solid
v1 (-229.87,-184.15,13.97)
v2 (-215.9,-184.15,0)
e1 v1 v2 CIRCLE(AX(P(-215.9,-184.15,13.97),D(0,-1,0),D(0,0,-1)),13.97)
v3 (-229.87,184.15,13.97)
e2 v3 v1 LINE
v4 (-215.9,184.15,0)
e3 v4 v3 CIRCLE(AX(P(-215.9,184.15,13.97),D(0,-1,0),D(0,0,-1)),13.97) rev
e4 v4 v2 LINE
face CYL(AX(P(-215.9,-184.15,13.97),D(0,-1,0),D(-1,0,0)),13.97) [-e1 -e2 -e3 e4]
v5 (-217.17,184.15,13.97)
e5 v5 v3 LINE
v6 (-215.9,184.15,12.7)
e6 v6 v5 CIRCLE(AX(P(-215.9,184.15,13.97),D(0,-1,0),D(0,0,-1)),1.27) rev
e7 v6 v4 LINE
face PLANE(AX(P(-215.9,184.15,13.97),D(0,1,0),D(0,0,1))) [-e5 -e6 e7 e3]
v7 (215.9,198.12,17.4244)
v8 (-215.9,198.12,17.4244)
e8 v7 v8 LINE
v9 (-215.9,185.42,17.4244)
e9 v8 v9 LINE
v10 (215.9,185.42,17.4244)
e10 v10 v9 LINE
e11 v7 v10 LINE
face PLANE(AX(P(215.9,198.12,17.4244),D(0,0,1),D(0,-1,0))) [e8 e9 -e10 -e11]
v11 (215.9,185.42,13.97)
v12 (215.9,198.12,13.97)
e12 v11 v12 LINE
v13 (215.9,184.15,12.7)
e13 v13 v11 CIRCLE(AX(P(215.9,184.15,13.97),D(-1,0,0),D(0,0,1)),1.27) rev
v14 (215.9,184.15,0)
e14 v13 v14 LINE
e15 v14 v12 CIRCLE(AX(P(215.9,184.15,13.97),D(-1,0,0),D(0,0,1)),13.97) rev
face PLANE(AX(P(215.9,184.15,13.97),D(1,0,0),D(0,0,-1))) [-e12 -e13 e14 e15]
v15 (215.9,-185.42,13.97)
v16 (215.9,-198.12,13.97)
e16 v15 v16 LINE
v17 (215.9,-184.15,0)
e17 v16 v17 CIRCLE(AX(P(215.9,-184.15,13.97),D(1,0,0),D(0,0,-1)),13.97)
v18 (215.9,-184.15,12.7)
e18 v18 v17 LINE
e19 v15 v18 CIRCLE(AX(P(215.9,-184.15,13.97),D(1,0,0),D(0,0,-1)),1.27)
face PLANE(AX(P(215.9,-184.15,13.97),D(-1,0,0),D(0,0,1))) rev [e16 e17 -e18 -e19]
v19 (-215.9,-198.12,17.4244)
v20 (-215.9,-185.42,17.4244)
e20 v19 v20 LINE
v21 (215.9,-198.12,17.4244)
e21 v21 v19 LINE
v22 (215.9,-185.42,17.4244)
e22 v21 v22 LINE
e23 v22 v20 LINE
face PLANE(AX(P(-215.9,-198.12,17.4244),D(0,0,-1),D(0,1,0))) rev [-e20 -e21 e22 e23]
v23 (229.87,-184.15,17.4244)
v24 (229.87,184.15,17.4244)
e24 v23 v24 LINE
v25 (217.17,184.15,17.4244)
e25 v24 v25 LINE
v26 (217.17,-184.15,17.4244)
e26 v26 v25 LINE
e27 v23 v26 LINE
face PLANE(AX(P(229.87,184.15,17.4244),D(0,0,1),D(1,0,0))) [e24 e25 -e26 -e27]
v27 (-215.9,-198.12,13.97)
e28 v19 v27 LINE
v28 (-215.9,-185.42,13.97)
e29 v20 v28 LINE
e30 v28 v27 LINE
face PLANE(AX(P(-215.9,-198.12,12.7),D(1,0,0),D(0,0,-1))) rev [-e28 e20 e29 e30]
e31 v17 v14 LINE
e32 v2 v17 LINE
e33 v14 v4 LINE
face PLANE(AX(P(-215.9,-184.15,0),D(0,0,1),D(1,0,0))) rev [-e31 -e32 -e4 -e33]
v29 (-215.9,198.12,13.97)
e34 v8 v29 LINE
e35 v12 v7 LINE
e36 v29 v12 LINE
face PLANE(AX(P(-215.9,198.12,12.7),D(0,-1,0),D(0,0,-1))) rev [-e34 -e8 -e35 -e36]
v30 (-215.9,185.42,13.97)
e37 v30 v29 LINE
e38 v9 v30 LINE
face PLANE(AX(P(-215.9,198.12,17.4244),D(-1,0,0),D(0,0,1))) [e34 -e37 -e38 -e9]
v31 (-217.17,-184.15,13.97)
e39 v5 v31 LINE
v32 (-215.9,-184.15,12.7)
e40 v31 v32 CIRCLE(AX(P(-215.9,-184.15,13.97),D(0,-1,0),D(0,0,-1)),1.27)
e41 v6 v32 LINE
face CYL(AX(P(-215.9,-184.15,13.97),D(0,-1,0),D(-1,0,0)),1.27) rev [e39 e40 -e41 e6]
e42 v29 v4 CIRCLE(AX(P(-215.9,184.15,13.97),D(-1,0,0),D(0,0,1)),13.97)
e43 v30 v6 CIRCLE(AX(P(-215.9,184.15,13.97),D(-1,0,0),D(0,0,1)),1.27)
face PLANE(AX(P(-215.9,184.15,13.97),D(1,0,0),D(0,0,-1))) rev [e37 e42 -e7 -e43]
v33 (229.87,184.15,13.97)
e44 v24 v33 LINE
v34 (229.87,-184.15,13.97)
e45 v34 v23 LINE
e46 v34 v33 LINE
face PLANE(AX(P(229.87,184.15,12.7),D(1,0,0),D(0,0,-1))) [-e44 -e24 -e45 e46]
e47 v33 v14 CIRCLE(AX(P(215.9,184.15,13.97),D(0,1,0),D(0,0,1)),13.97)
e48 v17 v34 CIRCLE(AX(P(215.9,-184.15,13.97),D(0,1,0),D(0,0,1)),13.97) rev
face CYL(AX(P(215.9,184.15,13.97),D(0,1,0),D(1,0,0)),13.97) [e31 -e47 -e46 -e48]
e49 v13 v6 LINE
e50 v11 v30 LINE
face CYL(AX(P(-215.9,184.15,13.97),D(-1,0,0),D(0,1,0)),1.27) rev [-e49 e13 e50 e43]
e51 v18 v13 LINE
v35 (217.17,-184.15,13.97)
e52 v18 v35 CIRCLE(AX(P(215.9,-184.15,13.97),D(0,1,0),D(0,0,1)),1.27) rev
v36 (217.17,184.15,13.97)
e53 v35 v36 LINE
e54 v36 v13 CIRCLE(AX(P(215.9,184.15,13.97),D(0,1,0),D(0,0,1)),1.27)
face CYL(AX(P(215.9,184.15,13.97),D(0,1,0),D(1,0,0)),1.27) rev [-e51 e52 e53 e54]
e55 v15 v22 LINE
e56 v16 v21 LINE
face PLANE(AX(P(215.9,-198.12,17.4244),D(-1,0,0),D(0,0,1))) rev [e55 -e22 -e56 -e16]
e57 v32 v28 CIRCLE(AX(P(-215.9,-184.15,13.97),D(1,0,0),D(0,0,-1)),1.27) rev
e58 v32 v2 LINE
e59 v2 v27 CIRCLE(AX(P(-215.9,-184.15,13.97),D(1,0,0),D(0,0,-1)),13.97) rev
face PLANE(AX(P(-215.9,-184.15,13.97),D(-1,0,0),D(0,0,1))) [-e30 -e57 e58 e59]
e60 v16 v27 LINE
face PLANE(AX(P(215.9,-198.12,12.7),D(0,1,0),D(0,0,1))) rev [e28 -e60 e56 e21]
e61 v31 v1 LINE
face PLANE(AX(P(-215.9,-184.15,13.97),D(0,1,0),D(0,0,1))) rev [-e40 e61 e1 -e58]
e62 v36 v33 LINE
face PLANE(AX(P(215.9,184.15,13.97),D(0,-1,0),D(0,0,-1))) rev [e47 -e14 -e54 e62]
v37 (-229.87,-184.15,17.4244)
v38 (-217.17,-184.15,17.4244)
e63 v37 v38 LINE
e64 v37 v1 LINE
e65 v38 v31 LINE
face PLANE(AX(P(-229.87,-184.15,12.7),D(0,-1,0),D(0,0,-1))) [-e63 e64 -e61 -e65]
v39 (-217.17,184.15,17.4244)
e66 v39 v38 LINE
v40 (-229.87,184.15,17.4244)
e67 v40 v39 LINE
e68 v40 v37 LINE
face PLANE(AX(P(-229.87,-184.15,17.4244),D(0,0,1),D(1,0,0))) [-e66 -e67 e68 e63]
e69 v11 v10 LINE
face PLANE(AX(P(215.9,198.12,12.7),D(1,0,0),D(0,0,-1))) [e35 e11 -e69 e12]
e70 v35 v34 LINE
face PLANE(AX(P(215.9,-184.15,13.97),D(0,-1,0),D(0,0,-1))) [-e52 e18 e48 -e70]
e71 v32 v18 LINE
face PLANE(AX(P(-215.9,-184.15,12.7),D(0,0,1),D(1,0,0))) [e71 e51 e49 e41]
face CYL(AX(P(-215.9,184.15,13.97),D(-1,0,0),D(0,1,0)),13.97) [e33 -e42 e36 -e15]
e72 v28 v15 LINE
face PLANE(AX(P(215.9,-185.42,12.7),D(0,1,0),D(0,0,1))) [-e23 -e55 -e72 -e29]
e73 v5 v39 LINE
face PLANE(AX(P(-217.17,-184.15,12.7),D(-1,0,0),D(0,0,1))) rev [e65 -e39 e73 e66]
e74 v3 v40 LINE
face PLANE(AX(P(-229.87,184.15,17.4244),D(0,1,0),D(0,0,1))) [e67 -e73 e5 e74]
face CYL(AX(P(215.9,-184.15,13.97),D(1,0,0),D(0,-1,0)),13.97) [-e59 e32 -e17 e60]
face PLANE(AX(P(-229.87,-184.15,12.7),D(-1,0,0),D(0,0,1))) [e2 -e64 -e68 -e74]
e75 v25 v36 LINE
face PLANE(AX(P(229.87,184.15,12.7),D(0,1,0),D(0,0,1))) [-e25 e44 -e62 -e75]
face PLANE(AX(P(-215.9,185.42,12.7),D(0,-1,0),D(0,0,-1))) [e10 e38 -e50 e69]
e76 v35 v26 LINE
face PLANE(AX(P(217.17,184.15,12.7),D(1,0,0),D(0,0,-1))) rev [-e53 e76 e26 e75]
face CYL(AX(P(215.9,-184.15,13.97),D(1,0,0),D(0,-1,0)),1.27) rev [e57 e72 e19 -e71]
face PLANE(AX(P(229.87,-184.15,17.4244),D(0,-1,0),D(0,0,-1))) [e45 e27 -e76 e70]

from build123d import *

# Parameters (mm, degrees)
SKETCH1_W          = 431.8
SKETCH1_H          = 368.3
BASE_FLANGE1_DEPTH = 12.7
EDGE_FLANGE1_DEPTH = 431.8
EDGE_FLANGE2_DEPTH = 431.8
EDGE_FLANGE3_DEPTH = 368.3
EDGE_FLANGE4_DEPTH = 368.3


# Sheet-metal steps are written as plain solids
with BuildPart() as part:
    # Sketch1 → Base-Flange1 (new body)
    with BuildSketch(Plane.XY):
        Rectangle(SKETCH1_W, SKETCH1_H)
    extrude(amount=BASE_FLANGE1_DEPTH)

    # Edge-Flange1 section (across the edge) → Edge-Flange1 (add)
    with BuildSketch(Plane(origin=(215.9, 185.42, 12.7), x_dir=(0, -1, 0), z_dir=(-1, 0, 0))):
        with BuildLine():
            Line((-12.7, 1.27), (-12.7, 4.7244))
            Line((-12.7, 4.7244), (0, 4.7244))
            Line((0, 4.7244), (0, 1.27))
            ThreePointArc((0, 1.27), (0.371974388, 0.371974388), (1.27, 0))
            Line((1.27, 0), (1.27, -12.7))
            ThreePointArc((1.27, -12.7), (-8.608281733, -8.608281733), (-12.7, 1.27))
        make_face()
    extrude(amount=EDGE_FLANGE1_DEPTH)

    # Edge-Flange2 section (across the edge) → Edge-Flange2 (add)
    with BuildSketch(Plane(origin=(-215.9, -185.42, 12.7), x_dir=(0, 1, 0), z_dir=(1, 0, 0))):
        with BuildLine():
            Line((-12.7, 1.27), (-12.7, 4.7244))
            Line((-12.7, 4.7244), (0, 4.7244))
            Line((0, 4.7244), (0, 1.27))
            ThreePointArc((0, 1.27), (0.371974388, 0.371974388), (1.27, 0))
            Line((1.27, 0), (1.27, -12.7))
            ThreePointArc((1.27, -12.7), (-8.608281733, -8.608281733), (-12.7, 1.27))
        make_face()
    extrude(amount=EDGE_FLANGE2_DEPTH)

    # Edge-Flange3 section (across the edge) → Edge-Flange3 (add)
    with BuildSketch(Plane(origin=(217.17, -184.15, 12.7), x_dir=(-1, 0, 0), z_dir=(0, 1, 0))):
        with BuildLine():
            Line((-12.7, 1.27), (-12.7, 4.7244))
            Line((-12.7, 4.7244), (0, 4.7244))
            Line((0, 4.7244), (0, 1.27))
            ThreePointArc((0, 1.27), (0.371974388, 0.371974388), (1.27, 0))
            Line((1.27, 0), (1.27, -12.7))
            ThreePointArc((1.27, -12.7), (-8.608281733, -8.608281733), (-12.7, 1.27))
        make_face()
    extrude(amount=EDGE_FLANGE3_DEPTH)

    # Edge-Flange4 section (across the edge) → Edge-Flange4 (add)
    with BuildSketch(Plane(origin=(-217.17, 184.15, 12.7), x_dir=(1, 0, 0), z_dir=(0, -1, 0))):
        with BuildLine():
            Line((-12.7, 1.27), (-12.7, 4.7244))
            Line((-12.7, 4.7244), (0, 4.7244))
            Line((0, 4.7244), (0, 1.27))
            ThreePointArc((0, 1.27), (0.371974388, 0.371974388), (1.27, 0))
            Line((1.27, 0), (1.27, -12.7))
            ThreePointArc((1.27, -12.7), (-8.608281733, -8.608281733), (-12.7, 1.27))
        make_face()
    extrude(amount=EDGE_FLANGE4_DEPTH)


solid = part.part
